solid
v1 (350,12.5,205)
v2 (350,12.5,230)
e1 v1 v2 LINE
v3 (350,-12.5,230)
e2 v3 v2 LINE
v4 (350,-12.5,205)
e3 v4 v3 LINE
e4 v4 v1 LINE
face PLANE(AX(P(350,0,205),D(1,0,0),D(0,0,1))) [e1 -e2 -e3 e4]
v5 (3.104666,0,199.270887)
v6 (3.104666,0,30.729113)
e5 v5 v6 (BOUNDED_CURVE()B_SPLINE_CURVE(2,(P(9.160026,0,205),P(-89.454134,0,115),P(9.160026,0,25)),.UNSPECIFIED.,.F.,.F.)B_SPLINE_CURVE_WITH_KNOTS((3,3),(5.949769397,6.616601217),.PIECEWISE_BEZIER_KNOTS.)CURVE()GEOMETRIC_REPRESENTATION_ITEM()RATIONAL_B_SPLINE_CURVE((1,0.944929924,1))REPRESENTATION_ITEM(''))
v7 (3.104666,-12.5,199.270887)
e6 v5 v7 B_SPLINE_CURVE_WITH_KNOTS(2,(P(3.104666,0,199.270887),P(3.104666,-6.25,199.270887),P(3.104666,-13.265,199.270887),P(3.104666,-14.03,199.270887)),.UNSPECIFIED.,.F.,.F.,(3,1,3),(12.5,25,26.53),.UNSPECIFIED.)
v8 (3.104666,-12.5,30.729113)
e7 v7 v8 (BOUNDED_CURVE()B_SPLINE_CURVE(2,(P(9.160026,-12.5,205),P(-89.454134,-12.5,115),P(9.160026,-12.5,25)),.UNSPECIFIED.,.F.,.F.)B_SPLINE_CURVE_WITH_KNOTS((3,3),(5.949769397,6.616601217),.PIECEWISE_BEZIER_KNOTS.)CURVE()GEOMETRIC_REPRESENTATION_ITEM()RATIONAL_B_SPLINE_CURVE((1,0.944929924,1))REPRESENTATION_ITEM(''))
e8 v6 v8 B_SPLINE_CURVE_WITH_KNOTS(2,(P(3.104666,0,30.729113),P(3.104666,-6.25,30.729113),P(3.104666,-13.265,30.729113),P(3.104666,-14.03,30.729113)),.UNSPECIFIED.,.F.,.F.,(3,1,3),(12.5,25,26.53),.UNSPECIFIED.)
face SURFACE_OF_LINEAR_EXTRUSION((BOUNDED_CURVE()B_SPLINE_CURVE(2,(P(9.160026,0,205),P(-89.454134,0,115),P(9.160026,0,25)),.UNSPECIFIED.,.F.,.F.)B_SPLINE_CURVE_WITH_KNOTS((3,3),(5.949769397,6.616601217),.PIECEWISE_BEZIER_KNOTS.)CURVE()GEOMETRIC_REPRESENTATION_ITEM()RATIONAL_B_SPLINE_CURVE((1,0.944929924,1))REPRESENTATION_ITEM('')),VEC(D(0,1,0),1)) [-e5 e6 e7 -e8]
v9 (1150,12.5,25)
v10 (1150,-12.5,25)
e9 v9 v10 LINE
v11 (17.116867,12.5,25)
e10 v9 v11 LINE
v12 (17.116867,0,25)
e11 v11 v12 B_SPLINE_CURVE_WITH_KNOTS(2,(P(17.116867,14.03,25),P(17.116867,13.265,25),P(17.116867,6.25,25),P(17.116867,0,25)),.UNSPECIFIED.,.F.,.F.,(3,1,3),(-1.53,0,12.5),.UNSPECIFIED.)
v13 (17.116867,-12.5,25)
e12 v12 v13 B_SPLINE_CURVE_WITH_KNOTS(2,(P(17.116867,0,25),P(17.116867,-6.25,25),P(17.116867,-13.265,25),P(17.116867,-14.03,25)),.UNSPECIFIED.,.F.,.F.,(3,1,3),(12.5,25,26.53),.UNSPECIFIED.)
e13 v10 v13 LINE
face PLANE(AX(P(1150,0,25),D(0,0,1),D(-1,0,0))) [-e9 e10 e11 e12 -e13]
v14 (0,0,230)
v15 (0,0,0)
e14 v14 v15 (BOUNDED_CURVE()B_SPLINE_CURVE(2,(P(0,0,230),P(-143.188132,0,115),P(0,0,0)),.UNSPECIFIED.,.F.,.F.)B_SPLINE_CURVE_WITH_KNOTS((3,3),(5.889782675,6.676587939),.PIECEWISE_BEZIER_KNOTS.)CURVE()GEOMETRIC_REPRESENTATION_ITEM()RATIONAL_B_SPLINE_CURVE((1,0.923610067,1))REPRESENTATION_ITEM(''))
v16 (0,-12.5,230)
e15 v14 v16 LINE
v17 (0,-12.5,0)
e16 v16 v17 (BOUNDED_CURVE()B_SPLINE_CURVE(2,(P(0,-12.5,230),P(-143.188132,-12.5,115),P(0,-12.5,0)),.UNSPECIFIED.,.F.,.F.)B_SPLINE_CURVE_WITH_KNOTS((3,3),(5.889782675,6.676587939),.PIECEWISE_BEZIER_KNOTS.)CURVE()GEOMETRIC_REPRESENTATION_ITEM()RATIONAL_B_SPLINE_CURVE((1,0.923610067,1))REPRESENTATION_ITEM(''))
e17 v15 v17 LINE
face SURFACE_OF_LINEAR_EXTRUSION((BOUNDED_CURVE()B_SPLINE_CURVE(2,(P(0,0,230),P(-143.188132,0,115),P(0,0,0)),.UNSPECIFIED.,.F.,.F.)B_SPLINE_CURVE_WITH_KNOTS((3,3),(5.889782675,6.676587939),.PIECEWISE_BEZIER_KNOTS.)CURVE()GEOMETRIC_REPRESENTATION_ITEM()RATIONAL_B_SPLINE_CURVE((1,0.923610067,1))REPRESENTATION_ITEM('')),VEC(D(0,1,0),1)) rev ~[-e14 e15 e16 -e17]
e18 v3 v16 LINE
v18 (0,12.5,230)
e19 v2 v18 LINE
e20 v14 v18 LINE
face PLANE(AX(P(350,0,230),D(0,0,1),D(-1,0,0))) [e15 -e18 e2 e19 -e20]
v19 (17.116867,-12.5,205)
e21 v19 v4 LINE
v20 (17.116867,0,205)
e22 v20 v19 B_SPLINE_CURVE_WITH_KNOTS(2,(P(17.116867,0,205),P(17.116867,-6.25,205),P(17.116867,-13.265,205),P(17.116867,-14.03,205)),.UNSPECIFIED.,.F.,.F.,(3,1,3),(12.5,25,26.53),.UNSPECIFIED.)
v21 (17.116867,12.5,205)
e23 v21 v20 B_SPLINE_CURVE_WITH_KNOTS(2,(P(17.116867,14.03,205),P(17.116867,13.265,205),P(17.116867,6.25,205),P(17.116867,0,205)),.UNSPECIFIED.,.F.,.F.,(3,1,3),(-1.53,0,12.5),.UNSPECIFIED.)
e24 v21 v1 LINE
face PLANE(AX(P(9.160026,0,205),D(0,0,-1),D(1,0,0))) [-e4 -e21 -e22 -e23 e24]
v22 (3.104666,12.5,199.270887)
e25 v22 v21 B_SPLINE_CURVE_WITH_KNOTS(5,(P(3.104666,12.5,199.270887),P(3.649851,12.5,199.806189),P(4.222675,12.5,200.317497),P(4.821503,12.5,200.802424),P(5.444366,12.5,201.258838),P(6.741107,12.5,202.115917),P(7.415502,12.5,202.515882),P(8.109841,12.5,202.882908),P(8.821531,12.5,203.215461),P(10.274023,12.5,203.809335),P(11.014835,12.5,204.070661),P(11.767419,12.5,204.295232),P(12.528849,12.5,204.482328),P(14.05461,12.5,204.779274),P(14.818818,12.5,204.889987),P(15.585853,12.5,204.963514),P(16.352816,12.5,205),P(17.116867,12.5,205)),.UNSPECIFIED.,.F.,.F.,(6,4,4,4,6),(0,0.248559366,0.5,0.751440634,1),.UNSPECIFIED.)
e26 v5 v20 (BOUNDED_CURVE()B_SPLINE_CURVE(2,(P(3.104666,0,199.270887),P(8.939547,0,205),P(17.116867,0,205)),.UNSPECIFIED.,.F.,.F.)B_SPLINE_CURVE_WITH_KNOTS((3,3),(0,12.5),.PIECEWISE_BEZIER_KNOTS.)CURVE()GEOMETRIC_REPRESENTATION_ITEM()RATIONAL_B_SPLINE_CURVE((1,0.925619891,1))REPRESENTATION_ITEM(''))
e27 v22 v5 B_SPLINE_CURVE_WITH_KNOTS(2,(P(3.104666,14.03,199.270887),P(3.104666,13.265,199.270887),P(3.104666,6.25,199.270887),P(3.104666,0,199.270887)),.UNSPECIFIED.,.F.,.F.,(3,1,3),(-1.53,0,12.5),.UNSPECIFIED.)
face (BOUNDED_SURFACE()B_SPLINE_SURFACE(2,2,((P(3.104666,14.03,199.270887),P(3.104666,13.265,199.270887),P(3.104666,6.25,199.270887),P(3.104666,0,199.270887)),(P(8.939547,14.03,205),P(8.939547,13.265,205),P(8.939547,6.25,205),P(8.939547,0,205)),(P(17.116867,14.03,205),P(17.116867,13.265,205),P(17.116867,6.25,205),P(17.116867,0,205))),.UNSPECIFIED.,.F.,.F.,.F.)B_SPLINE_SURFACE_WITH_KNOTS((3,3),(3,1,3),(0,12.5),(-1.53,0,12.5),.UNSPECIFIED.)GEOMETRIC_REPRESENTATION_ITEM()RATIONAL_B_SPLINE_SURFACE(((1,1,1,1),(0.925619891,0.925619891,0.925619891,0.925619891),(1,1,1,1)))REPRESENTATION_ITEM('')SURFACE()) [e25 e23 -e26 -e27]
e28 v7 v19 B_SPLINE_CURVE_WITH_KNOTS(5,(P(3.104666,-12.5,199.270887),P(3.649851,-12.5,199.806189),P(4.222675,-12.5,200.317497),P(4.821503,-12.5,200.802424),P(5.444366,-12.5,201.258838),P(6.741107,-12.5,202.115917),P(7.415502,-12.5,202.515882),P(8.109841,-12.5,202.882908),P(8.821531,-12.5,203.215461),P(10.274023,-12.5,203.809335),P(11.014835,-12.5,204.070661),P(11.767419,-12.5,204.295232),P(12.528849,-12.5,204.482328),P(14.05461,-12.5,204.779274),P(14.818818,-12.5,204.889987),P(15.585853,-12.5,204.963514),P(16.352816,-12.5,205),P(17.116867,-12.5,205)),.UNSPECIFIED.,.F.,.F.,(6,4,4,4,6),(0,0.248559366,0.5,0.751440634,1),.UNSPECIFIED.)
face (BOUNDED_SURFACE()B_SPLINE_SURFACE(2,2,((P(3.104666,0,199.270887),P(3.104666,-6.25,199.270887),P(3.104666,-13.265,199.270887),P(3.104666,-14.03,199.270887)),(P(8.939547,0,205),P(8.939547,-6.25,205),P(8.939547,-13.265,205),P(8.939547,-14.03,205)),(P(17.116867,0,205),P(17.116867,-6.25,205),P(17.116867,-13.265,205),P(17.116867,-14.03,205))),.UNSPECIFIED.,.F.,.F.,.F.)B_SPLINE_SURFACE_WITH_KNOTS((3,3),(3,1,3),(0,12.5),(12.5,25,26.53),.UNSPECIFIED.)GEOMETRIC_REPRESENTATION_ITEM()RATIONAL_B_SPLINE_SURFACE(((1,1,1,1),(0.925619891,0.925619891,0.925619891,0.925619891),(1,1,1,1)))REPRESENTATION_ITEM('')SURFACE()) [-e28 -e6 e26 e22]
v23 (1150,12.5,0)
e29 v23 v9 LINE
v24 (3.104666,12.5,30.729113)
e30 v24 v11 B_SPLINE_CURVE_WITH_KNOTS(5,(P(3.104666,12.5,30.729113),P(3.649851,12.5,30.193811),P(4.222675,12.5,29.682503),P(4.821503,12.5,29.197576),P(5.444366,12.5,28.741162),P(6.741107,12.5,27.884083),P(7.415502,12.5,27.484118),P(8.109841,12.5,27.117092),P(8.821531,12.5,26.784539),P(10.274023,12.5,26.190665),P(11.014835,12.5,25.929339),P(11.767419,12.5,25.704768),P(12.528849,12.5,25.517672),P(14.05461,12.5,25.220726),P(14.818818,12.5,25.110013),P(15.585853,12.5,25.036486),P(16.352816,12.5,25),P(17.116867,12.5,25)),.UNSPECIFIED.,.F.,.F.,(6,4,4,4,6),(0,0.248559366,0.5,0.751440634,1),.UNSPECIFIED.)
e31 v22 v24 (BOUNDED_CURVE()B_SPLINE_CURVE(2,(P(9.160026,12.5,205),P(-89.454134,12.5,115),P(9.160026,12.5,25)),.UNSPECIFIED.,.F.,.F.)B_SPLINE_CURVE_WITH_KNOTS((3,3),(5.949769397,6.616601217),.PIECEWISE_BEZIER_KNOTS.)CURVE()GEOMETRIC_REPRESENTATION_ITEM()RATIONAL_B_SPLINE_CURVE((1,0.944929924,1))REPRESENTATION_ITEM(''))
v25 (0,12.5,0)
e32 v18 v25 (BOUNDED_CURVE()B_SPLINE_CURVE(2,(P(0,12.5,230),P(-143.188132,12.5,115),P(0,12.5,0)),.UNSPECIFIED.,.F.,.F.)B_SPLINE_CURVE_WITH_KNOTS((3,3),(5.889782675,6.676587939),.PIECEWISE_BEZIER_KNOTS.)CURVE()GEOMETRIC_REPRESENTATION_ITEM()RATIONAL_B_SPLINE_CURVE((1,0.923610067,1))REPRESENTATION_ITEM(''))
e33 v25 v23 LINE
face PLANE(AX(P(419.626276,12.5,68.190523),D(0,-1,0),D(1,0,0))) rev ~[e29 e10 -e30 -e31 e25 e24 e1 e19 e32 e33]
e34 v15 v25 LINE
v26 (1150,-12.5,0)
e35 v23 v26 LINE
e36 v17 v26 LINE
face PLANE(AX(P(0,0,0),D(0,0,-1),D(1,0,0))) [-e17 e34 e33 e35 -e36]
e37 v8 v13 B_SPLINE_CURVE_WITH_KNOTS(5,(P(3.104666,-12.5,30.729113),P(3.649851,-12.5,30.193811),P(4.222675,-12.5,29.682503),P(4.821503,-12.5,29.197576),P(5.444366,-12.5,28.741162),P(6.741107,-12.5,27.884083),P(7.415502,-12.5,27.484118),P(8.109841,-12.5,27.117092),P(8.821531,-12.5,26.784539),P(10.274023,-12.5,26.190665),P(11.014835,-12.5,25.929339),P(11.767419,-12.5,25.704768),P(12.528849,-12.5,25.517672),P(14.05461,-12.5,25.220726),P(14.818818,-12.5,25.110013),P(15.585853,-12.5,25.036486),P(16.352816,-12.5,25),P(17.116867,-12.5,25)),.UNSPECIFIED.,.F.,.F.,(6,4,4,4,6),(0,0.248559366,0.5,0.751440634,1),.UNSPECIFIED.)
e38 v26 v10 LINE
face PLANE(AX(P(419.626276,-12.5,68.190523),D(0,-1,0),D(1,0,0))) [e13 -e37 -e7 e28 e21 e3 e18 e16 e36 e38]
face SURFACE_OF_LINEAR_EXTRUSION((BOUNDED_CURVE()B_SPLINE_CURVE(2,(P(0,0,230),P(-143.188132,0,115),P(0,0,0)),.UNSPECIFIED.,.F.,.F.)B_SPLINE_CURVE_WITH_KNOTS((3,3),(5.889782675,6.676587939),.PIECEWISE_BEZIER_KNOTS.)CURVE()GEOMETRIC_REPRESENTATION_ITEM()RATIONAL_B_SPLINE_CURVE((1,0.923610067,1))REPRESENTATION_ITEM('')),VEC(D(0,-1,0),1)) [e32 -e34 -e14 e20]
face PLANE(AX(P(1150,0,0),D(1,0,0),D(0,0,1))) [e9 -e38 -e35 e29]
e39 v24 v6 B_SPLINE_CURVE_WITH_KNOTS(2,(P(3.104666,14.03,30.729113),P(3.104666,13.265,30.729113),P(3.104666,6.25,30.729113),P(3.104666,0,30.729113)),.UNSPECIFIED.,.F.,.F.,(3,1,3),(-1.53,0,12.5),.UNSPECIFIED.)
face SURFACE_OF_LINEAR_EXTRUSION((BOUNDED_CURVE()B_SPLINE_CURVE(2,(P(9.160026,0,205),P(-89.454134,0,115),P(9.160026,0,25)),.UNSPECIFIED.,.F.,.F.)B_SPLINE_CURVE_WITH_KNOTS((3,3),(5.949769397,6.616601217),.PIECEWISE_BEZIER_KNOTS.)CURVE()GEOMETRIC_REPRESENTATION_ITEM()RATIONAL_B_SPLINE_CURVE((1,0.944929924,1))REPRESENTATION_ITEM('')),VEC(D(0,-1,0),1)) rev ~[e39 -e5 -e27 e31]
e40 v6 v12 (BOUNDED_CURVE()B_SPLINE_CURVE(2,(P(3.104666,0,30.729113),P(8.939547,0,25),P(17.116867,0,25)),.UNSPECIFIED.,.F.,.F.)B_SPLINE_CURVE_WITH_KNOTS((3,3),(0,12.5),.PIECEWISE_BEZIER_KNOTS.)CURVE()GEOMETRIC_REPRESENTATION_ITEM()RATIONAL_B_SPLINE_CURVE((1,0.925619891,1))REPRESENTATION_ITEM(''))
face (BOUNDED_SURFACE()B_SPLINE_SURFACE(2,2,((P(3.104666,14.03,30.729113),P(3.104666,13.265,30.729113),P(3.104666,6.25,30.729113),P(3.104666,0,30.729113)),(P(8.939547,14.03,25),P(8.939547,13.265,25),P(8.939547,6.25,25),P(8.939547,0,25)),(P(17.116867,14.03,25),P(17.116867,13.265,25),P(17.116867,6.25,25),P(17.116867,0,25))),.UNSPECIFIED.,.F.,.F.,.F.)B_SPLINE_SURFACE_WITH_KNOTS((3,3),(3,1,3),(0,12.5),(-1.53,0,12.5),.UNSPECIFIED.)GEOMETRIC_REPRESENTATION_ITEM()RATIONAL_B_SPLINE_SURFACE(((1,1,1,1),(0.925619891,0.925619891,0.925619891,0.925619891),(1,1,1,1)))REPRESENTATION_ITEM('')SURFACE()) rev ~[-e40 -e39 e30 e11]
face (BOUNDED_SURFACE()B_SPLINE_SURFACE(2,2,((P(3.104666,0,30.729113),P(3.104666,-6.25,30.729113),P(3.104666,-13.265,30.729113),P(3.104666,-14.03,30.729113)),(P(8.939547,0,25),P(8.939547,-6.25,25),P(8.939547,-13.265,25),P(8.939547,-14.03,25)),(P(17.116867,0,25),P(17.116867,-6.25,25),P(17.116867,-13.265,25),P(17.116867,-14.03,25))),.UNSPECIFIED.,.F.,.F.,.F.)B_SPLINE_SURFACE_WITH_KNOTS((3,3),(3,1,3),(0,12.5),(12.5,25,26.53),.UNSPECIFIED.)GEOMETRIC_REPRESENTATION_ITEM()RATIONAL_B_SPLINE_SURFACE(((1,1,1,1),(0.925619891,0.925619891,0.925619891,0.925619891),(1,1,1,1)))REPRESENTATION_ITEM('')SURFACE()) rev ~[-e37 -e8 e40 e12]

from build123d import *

# Parameters (mm, degrees)
F1_DEPTH = 12.5
F2_R     = 20


with BuildPart() as f1:
    # F0 (on Front) → F1 (new body, symmetric)
    with BuildSketch(Plane.XZ):
        with BuildLine():
            add(Edge.make_bspline(
                [(0, 230), (-143.18813182, 115), (0, 0)],
                knots=[5.8897826752, 5.8897826752, 5.8897826752, 6.6765879392, 6.6765879392, 6.6765879392], degree=2, weights=[1, 0.9236100668, 1]))
            Line((0, 0), (1150, 0))
            Line((1150, 0), (1150, 25))
            Line((1150, 25), (9.1600259417, 25))
            add(Edge.make_bspline(
                [(9.1600259417, 205), (-89.4541344002, 115), (9.1600259417, 25)],
                knots=[5.949769397, 5.949769397, 5.949769397, 6.6166012174, 6.6166012174, 6.6166012174], degree=2, weights=[1, 0.9449299244, 1]))
            Line((9.1600259417, 205), (350, 205))
            Line((350, 205), (350, 230))
            Line((350, 230), (0, 230))
        make_face()
    extrude(amount=F1_DEPTH, both=True)

    # F2
    f2_edges = [f1.edges().sort_by_distance(p)[0] for p in [
        (9.160026, -6.25, 25),
        (9.160026, 6.25, 25),
        (9.160026, -6.25, 205),
        (9.160026, 6.25, 205),
    ]]
    fillet(f2_edges, radius=F2_R)


solid = f1.part
